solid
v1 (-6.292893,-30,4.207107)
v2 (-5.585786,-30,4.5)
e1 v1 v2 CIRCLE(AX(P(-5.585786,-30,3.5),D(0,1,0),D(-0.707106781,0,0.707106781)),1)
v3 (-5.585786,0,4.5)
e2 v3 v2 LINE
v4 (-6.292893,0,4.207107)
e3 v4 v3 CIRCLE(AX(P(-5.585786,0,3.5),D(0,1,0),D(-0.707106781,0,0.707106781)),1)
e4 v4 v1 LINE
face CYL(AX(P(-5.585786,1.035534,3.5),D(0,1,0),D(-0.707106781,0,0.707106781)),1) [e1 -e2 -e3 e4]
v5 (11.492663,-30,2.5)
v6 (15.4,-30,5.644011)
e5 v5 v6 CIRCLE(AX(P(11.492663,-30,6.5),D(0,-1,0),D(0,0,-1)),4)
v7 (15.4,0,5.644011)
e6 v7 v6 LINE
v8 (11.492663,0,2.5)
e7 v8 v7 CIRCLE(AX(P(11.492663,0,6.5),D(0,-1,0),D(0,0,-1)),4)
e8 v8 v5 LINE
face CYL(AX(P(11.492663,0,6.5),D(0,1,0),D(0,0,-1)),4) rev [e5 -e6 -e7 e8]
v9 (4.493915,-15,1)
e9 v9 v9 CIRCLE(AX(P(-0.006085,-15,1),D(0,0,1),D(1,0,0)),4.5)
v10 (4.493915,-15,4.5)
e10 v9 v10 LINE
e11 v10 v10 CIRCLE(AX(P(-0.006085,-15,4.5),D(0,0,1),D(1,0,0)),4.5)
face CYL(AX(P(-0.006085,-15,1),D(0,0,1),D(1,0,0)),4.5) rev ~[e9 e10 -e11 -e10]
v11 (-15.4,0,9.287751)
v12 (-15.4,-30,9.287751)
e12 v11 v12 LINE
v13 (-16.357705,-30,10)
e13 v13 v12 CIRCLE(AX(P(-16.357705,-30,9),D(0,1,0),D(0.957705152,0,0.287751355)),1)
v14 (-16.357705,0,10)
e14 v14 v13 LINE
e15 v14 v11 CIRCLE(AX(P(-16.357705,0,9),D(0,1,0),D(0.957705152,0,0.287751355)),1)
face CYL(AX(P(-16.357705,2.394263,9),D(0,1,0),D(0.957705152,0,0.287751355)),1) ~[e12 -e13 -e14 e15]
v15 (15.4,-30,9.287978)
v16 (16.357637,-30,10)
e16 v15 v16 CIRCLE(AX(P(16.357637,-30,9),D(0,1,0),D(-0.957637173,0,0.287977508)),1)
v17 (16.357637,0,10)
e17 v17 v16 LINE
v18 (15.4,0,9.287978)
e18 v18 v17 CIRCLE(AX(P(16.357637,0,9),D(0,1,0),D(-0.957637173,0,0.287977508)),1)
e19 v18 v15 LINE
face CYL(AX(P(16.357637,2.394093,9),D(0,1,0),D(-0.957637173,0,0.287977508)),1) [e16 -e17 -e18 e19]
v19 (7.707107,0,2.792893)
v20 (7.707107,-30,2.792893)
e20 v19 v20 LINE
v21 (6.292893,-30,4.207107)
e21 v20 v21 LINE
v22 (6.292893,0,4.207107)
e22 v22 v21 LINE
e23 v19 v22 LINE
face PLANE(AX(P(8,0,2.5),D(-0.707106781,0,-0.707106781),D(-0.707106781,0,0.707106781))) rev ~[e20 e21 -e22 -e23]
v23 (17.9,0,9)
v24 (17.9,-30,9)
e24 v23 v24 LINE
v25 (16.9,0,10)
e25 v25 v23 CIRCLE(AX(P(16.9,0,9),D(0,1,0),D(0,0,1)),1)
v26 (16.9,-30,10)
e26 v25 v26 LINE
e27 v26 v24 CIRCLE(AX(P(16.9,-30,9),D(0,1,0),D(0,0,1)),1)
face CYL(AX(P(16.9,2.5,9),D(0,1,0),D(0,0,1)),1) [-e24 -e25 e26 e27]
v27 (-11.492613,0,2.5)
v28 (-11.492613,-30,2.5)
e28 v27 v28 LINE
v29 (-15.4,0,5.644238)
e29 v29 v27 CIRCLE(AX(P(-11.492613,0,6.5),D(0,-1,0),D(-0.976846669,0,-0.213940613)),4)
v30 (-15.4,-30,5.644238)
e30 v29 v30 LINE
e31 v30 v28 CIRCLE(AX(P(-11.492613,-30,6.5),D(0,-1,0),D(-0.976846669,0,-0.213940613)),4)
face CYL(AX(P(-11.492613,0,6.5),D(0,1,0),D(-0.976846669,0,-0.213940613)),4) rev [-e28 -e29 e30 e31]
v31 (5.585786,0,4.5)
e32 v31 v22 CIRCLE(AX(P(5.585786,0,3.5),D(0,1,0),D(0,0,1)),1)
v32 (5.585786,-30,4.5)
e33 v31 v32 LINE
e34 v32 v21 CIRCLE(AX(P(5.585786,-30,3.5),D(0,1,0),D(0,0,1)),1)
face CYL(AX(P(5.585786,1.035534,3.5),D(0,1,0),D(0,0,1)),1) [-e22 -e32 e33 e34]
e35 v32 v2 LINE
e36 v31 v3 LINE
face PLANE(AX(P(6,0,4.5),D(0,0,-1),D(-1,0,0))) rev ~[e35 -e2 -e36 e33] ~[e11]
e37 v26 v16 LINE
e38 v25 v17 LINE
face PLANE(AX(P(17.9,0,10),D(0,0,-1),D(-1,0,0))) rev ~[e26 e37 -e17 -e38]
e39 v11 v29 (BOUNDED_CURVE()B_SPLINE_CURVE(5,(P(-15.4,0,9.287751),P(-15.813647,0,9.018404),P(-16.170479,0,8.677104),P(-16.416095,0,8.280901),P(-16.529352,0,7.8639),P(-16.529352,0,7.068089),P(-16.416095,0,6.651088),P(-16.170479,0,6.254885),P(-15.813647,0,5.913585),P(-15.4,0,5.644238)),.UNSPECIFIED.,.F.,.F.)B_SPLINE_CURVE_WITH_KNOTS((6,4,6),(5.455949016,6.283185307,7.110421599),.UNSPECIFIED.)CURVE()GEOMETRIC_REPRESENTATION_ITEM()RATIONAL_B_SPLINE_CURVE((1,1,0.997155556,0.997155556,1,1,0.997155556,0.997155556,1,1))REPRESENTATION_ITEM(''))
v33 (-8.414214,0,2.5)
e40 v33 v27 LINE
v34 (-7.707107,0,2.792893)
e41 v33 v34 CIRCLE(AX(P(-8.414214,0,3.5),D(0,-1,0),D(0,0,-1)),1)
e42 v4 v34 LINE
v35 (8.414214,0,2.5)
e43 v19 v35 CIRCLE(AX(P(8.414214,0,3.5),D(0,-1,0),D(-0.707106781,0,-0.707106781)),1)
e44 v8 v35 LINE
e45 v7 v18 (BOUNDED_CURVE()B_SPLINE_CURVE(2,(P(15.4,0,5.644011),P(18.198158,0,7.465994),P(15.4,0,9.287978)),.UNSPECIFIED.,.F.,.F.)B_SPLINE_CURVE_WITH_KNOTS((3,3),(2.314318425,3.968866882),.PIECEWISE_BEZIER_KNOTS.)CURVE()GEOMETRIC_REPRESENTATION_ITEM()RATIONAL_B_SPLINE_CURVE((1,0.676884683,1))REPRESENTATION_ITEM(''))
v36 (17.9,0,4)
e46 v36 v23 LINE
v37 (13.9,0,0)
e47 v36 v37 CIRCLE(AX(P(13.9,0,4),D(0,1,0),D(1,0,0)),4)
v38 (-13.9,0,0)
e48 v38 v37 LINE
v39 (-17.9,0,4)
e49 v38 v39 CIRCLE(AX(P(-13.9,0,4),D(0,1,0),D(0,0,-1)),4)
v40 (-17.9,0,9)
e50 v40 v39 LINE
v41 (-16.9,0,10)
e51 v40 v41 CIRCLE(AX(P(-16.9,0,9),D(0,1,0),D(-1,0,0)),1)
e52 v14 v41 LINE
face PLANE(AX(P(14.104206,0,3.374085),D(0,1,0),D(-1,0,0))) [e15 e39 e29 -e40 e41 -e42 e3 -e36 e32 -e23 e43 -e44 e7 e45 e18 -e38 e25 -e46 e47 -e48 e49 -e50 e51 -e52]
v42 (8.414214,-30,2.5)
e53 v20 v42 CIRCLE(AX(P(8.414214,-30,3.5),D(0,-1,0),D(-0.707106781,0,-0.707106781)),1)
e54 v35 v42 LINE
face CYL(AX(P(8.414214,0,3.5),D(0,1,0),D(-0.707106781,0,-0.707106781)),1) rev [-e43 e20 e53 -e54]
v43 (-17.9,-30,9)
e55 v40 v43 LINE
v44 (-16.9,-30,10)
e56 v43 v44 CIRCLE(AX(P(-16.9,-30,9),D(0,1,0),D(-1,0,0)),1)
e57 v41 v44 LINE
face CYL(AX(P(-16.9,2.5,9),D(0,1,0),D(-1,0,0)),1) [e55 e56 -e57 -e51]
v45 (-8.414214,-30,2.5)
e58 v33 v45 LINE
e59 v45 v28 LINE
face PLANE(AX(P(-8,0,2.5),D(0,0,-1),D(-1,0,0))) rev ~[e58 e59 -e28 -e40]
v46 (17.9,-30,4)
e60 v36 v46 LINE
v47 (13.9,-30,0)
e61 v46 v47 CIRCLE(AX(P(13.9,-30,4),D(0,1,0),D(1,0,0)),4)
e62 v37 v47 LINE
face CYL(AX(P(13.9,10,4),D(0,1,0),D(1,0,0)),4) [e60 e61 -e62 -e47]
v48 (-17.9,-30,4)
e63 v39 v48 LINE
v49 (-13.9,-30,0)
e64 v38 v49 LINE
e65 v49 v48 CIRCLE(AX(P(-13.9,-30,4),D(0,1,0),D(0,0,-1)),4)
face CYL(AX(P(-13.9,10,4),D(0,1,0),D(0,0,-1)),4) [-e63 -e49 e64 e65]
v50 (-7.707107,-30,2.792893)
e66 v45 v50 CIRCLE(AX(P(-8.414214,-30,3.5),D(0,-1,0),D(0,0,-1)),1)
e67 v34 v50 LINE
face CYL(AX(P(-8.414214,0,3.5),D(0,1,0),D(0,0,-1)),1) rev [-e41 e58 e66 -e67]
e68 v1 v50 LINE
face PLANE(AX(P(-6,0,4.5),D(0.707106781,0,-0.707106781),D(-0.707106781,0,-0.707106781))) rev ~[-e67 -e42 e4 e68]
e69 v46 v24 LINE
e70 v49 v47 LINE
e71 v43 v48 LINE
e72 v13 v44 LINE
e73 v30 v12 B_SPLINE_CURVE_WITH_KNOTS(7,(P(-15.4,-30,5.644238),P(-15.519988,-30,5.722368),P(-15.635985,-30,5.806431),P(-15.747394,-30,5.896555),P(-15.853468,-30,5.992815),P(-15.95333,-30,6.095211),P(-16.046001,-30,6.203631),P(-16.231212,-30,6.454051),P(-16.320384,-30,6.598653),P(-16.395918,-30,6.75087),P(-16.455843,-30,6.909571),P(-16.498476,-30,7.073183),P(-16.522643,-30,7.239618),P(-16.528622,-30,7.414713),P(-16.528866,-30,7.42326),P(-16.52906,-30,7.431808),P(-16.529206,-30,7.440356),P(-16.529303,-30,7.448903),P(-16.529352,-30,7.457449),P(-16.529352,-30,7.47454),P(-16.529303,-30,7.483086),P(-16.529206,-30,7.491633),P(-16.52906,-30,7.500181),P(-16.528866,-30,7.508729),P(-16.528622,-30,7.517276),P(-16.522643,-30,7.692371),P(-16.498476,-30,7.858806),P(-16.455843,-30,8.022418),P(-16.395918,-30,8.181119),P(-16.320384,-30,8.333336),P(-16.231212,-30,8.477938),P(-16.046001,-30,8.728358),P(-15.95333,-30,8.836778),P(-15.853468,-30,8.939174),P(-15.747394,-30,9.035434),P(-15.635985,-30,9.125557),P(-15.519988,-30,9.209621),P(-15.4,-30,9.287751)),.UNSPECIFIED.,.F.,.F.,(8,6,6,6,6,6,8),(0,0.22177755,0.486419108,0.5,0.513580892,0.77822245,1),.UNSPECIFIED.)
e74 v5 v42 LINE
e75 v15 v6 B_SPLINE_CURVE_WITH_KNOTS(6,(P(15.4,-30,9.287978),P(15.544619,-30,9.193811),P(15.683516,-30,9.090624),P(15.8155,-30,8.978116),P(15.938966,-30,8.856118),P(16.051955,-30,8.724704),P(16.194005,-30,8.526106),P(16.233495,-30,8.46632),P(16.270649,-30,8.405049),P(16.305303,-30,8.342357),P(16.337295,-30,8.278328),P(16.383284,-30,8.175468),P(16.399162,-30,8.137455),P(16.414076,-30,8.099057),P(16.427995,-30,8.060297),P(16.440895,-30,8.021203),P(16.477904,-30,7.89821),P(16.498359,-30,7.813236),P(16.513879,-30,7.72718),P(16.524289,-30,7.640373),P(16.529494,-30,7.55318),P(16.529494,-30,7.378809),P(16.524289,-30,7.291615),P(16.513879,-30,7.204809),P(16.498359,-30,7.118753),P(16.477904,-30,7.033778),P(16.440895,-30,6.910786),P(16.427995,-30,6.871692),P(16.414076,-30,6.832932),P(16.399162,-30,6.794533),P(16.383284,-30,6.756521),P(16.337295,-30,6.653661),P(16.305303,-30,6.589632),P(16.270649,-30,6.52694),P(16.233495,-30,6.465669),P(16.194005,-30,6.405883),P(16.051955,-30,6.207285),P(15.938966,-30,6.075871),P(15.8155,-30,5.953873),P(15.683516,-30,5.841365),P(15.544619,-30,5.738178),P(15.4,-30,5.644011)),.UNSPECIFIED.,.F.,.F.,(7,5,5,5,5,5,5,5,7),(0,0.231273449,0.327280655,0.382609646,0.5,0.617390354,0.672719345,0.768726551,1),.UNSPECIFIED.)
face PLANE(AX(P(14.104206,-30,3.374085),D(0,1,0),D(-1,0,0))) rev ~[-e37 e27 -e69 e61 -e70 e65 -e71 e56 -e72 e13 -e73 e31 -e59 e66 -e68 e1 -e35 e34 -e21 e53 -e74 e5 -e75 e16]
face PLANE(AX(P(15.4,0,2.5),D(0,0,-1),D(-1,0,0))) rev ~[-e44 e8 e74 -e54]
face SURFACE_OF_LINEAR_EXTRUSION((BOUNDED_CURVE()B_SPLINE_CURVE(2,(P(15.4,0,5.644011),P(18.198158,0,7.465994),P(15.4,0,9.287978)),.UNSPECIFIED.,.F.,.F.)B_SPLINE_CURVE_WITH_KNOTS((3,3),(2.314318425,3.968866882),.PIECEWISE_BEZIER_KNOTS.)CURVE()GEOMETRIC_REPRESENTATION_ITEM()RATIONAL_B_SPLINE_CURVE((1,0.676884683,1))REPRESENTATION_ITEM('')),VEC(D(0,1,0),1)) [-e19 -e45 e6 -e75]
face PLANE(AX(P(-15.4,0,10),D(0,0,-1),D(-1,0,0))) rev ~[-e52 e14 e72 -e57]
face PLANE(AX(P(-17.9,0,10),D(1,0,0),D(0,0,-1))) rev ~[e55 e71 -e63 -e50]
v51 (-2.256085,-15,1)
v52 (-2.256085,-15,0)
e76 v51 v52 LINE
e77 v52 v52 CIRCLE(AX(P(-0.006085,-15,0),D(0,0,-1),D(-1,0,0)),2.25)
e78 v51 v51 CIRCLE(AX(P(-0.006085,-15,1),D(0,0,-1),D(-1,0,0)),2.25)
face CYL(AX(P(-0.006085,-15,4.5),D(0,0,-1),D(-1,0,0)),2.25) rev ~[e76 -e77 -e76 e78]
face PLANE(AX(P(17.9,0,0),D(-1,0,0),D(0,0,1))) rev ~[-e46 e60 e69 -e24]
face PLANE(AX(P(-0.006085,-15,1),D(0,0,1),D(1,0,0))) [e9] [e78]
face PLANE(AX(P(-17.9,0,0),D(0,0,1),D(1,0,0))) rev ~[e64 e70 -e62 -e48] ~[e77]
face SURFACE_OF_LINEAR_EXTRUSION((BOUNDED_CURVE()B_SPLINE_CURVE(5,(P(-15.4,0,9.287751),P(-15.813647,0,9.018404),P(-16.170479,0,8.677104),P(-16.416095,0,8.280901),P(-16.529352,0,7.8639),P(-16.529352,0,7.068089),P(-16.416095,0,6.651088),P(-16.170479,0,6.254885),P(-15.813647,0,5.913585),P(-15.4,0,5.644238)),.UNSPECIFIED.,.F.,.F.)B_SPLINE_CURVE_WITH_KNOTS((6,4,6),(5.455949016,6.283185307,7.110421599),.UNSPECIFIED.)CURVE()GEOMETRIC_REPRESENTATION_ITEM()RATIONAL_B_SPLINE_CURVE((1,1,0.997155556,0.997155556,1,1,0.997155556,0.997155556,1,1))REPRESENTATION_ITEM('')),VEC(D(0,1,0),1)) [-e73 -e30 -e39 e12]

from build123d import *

# Parameters (mm, degrees)
F1_DEPTH       = 30
F3_D           = 4.5
F3_CBORE_D     = 9
F3_CBORE_DEPTH = 3.5
F4_DEPTH       = 30.0010001
F5_T1_DEPTH    = 30
F5_T3_DEPTH    = 30
F5_T5_DEPTH    = 34.788525759
F5_T7_DEPTH    = 35
F5_T9_DEPTH    = 32.0710678119
F5_T11_DEPTH   = 32.0710678119
F5_T13_DEPTH   = 34.7881858635
F5_T15_DEPTH   = 35
F6_T1_DEPTH    = 30
F6_T3_DEPTH    = 30
F6_T5_DEPTH    = 50
F6_T7_DEPTH    = 50


# Not quite as in the source:
# - a fillet or chamfer that OpenCascade refuses, or shapes differently, is made with other operations: its cross-section is extruded or revolved along the edge and cut away or added


with BuildPart() as f1:
    # F0 (on Front) → F1 (new body)
    with BuildSketch(Plane.XZ):
        with BuildLine():
            Line((-17.9, 10), (-17.9, 0))
            Line((-17.9, 0), (17.9, 0))
            Line((17.9, 0), (17.9, 10))
            Line((17.9, 10), (15.4, 10))
            Line((15.4, 10), (15.4, 9.2879775086))
            add(Edge.make_bspline(
                [(15.4, 5.6440113938), (18.1981581314, 7.4659944512), (15.4, 9.2879775086)],
                knots=[2.3143184253, 2.3143184253, 2.3143184253, 3.9688668818, 3.9688668818, 3.9688668818], degree=2, weights=[1, 0.676884683, 1]))
            Line((15.4, 5.6440113938), (15.4, 2.5))
            Line((15.4, 2.5), (8, 2.5))
            Line((8, 2.5), (6, 4.5))
            Line((6, 4.5), (-6, 4.5))
            Line((-6, 4.5), (-8, 2.5))
            Line((-8, 2.5), (-15.4, 2.5))
            Line((-15.4, 2.5), (-15.4, 5.6442375475))
            add(Edge.make_bspline(
                [(-16.5293519812, 7.4659944512), (-16.5293519812, 6.3796188728), (-15.4, 5.6442375475)],
                knots=[0, 0, 0, 0.8272362915, 0.8272362915, 0.8272362915], degree=2, weights=[1, 0.9156725963, 1]))
            add(Edge.make_bspline(
                [(-15.4, 9.2877513548), (-16.5293519812, 8.5523700296), (-16.5293519812, 7.4659944512)],
                knots=[5.4559490157, 5.4559490157, 5.4559490157, 6.2831853072, 6.2831853072, 6.2831853072], degree=2, weights=[1, 0.9156725963, 1]))
            Line((-15.4, 9.2877513548), (-15.4, 10))
            Line((-15.4, 10), (-17.9, 10))
        make_face()
        with BuildLine():
            add(Edge.make_bspline(
                [(-15.4, 5.6442375475), (-9.5383519812, 1.8274058066), (-9.5383519812, 7.4659944512), (-9.5383519812, 13.1045830958), (-15.4, 9.2877513548)],
                knots=[0.8272362915, 0.8272362915, 0.8272362915, 3.1415926536, 3.1415926536, 5.4559490157, 5.4559490157, 5.4559490157], degree=2, weights=[1, 0.4019249885, 1, 0.4019249885, 1]))
            Line((-15.4, 9.2877513548), (-15.4, 5.6442375475))
        make_face()
        with BuildLine():
            Line((-15.4, 5.6442375475), (-15.4, 9.2877513548))
            add(Edge.make_bspline(
                [(-15.4, 9.2877513548), (-16.5293519812, 8.5523700296), (-16.5293519812, 7.4659944512)],
                knots=[5.4559490157, 5.4559490157, 5.4559490157, 6.2831853072, 6.2831853072, 6.2831853072], degree=2, weights=[1, 0.9156725963, 1]))
            add(Edge.make_bspline(
                [(-16.5293519812, 7.4659944512), (-16.5293519812, 6.3796188728), (-15.4, 5.6442375475)],
                knots=[0, 0, 0, 0.8272362915, 0.8272362915, 0.8272362915], degree=2, weights=[1, 0.9156725963, 1]))
        make_face()
        with BuildLine():
            add(Edge.make_bspline(
                [(15.4, 5.6440113938), (18.1981581314, 7.4659944512), (15.4, 9.2879775086)],
                knots=[2.3143184253, 2.3143184253, 2.3143184253, 3.9688668818, 3.9688668818, 3.9688668818], degree=2, weights=[1, 0.676884683, 1]))
            Line((15.4, 9.2879775086), (15.4, 5.6440113938))
        make_face()
        with BuildLine():
            Line((15.4, 5.6440113938), (15.4, 9.2879775086))
            add(Edge.make_bspline(
                [(15.4, 9.2879775086), (9.5382216203, 13.1047957127), (9.5382216203, 7.4659944512)],
                knots=[3.9688668818, 3.9688668818, 3.9688668818, 6.2831853072, 6.2831853072, 6.2831853072], degree=2, weights=[1, 0.4019423572, 1]))
            add(Edge.make_bspline(
                [(9.5382216203, 7.4659944512), (9.5382216203, 1.8271931896), (15.4, 5.6440113938)],
                knots=[0, 0, 0, 2.3143184253, 2.3143184253, 2.3143184253], degree=2, weights=[1, 0.4019423572, 1]))
        make_face()
    extrude(amount=F1_DEPTH)

    # F3 (through all)
    with Locations(Plane.XY.offset(4.5)):
        with Locations((-0.0060852617, -15)):
            CounterBoreHole(F3_D / 2, F3_CBORE_D / 2, F3_CBORE_DEPTH)

    # F0 (on Front) → F4 (cut, through all)
    with BuildSketch(Plane.XZ):
        with BuildLine():
            Line((15.4, 5.6440113938), (15.4, 9.2879775086))
            add(Edge.make_bspline(
                [(15.4, 9.2879775086), (9.5382216203, 13.1047957127), (9.5382216203, 7.4659944512)],
                knots=[3.9688668818, 3.9688668818, 3.9688668818, 6.2831853072, 6.2831853072, 6.2831853072], degree=2, weights=[1, 0.4019423572, 1]))
            add(Edge.make_bspline(
                [(9.5382216203, 7.4659944512), (9.5382216203, 1.8271931896), (15.4, 5.6440113938)],
                knots=[0, 0, 0, 2.3143184253, 2.3143184253, 2.3143184253], degree=2, weights=[1, 0.4019423572, 1]))
        make_face()
        with BuildLine():
            add(Edge.make_bspline(
                [(15.4, 5.6440113938), (18.1981581314, 7.4659944512), (15.4, 9.2879775086)],
                knots=[2.3143184253, 2.3143184253, 2.3143184253, 3.9688668818, 3.9688668818, 3.9688668818], degree=2, weights=[1, 0.676884683, 1]))
            Line((15.4, 9.2879775086), (15.4, 5.6440113938))
        make_face()
        with BuildLine():
            add(Edge.make_bspline(
                [(-15.4, 5.6442375475), (-9.5383519812, 1.8274058066), (-9.5383519812, 7.4659944512), (-9.5383519812, 13.1045830958), (-15.4, 9.2877513548)],
                knots=[0.8272362915, 0.8272362915, 0.8272362915, 3.1415926536, 3.1415926536, 5.4559490157, 5.4559490157, 5.4559490157], degree=2, weights=[1, 0.4019249885, 1, 0.4019249885, 1]))
            Line((-15.4, 9.2877513548), (-15.4, 5.6442375475))
        make_face()
        with BuildLine():
            Line((-15.4, 5.6442375475), (-15.4, 9.2877513548))
            add(Edge.make_bspline(
                [(-15.4, 9.2877513548), (-16.5293519812, 8.5523700296), (-16.5293519812, 7.4659944512)],
                knots=[5.4559490157, 5.4559490157, 5.4559490157, 6.2831853072, 6.2831853072, 6.2831853072], degree=2, weights=[1, 0.9156725963, 1]))
            add(Edge.make_bspline(
                [(-16.5293519812, 7.4659944512), (-16.5293519812, 6.3796188728), (-15.4, 5.6442375475)],
                knots=[0, 0, 0, 0.8272362915, 0.8272362915, 0.8272362915], degree=2, weights=[1, 0.9156725963, 1]))
        make_face()
    extrude(amount=F4_DEPTH, mode=Mode.SUBTRACT)

    # F5: fillet of radius 1 on 8 edges, made by hand

    # F5_s2 → F5_t1 (join)
    with BuildSketch(Plane.XZ):
        with BuildLine():
            ThreePointArc((-8.4142135624, 2.5), (-8.03153013, 2.5761204675), (-7.7071067812, 2.7928932188))
            Line((-7.7071067812, 2.7928932188), (-7.6929646456, 2.7787510832))
            Line((-7.6929646456, 2.7787510832), (-7.9917157288, 2.48))
            Line((-7.9917157288, 2.48), (-8.4142135624, 2.48))
            Line((-8.4142135624, 2.48), (-8.4142135624, 2.5))
        make_face()
    extrude(amount=F5_T1_DEPTH)

    # F5_s4 → F5_t3 (join)
    with BuildSketch(Plane.XZ):
        with BuildLine():
            ThreePointArc((7.7071067812, 2.7928932188), (8.03153013, 2.5761204675), (8.4142135624, 2.5))
            Line((8.4142135624, 2.5), (8.4142135624, 2.48))
            Line((8.4142135624, 2.48), (7.9917157288, 2.48))
            Line((7.9917157288, 2.48), (7.6929646456, 2.7787510832))
            Line((7.6929646456, 2.7787510832), (7.7071067812, 2.7928932188))
        make_face()
    extrude(amount=F5_T3_DEPTH)

    # F5_s6 → F5_t5 (cut)
    with BuildSketch(Plane.XZ.offset(-2.3942628795)):
        with BuildLine():
            ThreePointArc((-15.4, 9.2877513548), (-15.7609436227, 9.8024186422), (-16.3577051518, 10))
            Line((-16.3577051518, 10), (-16.3577051518, 10.02))
            Line((-16.3577051518, 10.02), (-15.4, 10.02))
            Line((-15.4, 10.02), (-15.38, 10))
            ThreePointArc((-15.38, 10), (-15.38, 9.6438756774), (-15.380845897, 9.2935063819))
            Line((-15.380845897, 9.2935063819), (-15.4, 9.2877513548))
        make_face()
    extrude(amount=F5_T5_DEPTH, mode=Mode.SUBTRACT)

    # F5_s8 → F5_t7 (cut)
    with BuildSketch(Plane.XZ.offset(-2.5)):
        with BuildLine():
            ThreePointArc((-17.9, 9), (-17.6071067812, 9.7071067812), (-16.9, 10))
            Line((-16.9, 10), (-16.9, 10.02))
            Line((-16.9, 10.02), (-17.92, 10.02))
            Line((-17.92, 10.02), (-17.92, 9))
            Line((-17.92, 9), (-17.9, 9))
        make_face()
    extrude(amount=F5_T7_DEPTH, mode=Mode.SUBTRACT)

    # F5_s10 → F5_t9 (cut)
    with BuildSketch(Plane.XZ.offset(-1.0355339059)):
        with BuildLine():
            ThreePointArc((-6.2928932188, 4.2071067812), (-5.96846987, 4.4238795325), (-5.5857864376, 4.5))
            Line((-5.5857864376, 4.5), (-5.5857864376, 4.52))
            Line((-5.5857864376, 4.52), (-6.0082842712, 4.52))
            Line((-6.0082842712, 4.52), (-6.3070353544, 4.2212489168))
            Line((-6.3070353544, 4.2212489168), (-6.2928932188, 4.2071067812))
        make_face()
    extrude(amount=F5_T9_DEPTH, mode=Mode.SUBTRACT)

    # F5_s12 → F5_t11 (cut)
    with BuildSketch(Plane.XZ.offset(-1.0355339059)):
        with BuildLine():
            ThreePointArc((5.5857864376, 4.5), (5.96846987, 4.4238795325), (6.2928932188, 4.2071067812))
            Line((6.2928932188, 4.2071067812), (6.3070353544, 4.2212489168))
            Line((6.3070353544, 4.2212489168), (6.0082842712, 4.52))
            Line((6.0082842712, 4.52), (5.5857864376, 4.52))
            Line((5.5857864376, 4.52), (5.5857864376, 4.5))
        make_face()
    extrude(amount=F5_T11_DEPTH, mode=Mode.SUBTRACT)

    # F5_s14 → F5_t13 (cut)
    with BuildSketch(Plane.XZ.offset(-2.3940929318)):
        with BuildLine():
            ThreePointArc((15.4, 9.2879775086), (15.7609703932, 9.8024890992), (16.3576371727, 10))
            Line((16.3576371727, 10), (16.3576371727, 10.02))
            Line((16.3576371727, 10.02), (15.4, 10.02))
            Line((15.4, 10.02), (15.38, 10))
            ThreePointArc((15.38, 10), (15.38, 9.6439887543), (15.3808472565, 9.2937370588))
            Line((15.3808472565, 9.2937370588), (15.4, 9.2879775086))
        make_face()
    extrude(amount=F5_T13_DEPTH, mode=Mode.SUBTRACT)

    # F5_s16 → F5_t15 (cut)
    with BuildSketch(Plane.XZ.offset(-2.5)):
        with BuildLine():
            ThreePointArc((16.9, 10), (17.6071067812, 9.7071067812), (17.9, 9))
            Line((17.9, 9), (17.92, 9))
            Line((17.92, 9), (17.92, 10.02))
            Line((17.92, 10.02), (16.9, 10.02))
            Line((16.9, 10.02), (16.9, 10))
        make_face()
    extrude(amount=F5_T15_DEPTH, mode=Mode.SUBTRACT)

    # F6: fillet of radius 4 on 4 edges, made by hand

    # F6_s2 → F6_t1 (join)
    with BuildSketch(Plane.XZ):
        with BuildLine():
            ThreePointArc((-15.4, 5.6442375475), (-14.000296538, 3.3836680368), (-11.4926133254, 2.5))
            Line((-11.4926133254, 2.5), (-11.4926133254, 2.42))
            Line((-11.4926133254, 2.42), (-15.4, 2.42))
            Line((-15.4, 2.42), (-15.48, 2.5))
            ThreePointArc((-15.48, 2.5), (-15.48, 4.0721187738), (-15.4781477335, 5.6271222985))
            Line((-15.4781477335, 5.6271222985), (-15.4, 5.6442375475))
        make_face()
    extrude(amount=F6_T1_DEPTH)

    # F6_s4 → F6_t3 (join)
    with BuildSketch(Plane.XZ):
        with BuildLine():
            ThreePointArc((11.4926628625, 2.5), (14.0002558892, 3.3835954671), (15.4, 5.6440113938))
            Line((15.4, 5.6440113938), (15.4781467427, 5.6268916217))
            ThreePointArc((15.4781467427, 5.6268916217), (15.48, 4.0720056969), (15.48, 2.5))
            Line((15.48, 2.5), (15.4, 2.42))
            Line((15.4, 2.42), (11.4926628625, 2.42))
            Line((11.4926628625, 2.42), (11.4926628625, 2.5))
        make_face()
    extrude(amount=F6_T3_DEPTH)

    # F6_s6 → F6_t5 (cut)
    with BuildSketch(Plane.XZ.offset(-10)):
        with BuildLine():
            ThreePointArc((17.9, 4), (16.7284271247, 1.1715728753), (13.9, 0))
            Line((13.9, 0), (13.9, -0.08))
            Line((13.9, -0.08), (17.98, -0.08))
            Line((17.98, -0.08), (17.98, 4))
            Line((17.98, 4), (17.9, 4))
        make_face()
    extrude(amount=F6_T5_DEPTH, mode=Mode.SUBTRACT)

    # F6_s8 → F6_t7 (cut)
    with BuildSketch(Plane.XZ.offset(-10)):
        with BuildLine():
            ThreePointArc((-13.9, 0), (-16.7284271247, 1.1715728753), (-17.9, 4))
            Line((-17.9, 4), (-17.98, 4))
            Line((-17.98, 4), (-17.98, -0.08))
            Line((-17.98, -0.08), (-13.9, -0.08))
            Line((-13.9, -0.08), (-13.9, 0))
        make_face()
    extrude(amount=F6_T7_DEPTH, mode=Mode.SUBTRACT)


solid = f1.part
